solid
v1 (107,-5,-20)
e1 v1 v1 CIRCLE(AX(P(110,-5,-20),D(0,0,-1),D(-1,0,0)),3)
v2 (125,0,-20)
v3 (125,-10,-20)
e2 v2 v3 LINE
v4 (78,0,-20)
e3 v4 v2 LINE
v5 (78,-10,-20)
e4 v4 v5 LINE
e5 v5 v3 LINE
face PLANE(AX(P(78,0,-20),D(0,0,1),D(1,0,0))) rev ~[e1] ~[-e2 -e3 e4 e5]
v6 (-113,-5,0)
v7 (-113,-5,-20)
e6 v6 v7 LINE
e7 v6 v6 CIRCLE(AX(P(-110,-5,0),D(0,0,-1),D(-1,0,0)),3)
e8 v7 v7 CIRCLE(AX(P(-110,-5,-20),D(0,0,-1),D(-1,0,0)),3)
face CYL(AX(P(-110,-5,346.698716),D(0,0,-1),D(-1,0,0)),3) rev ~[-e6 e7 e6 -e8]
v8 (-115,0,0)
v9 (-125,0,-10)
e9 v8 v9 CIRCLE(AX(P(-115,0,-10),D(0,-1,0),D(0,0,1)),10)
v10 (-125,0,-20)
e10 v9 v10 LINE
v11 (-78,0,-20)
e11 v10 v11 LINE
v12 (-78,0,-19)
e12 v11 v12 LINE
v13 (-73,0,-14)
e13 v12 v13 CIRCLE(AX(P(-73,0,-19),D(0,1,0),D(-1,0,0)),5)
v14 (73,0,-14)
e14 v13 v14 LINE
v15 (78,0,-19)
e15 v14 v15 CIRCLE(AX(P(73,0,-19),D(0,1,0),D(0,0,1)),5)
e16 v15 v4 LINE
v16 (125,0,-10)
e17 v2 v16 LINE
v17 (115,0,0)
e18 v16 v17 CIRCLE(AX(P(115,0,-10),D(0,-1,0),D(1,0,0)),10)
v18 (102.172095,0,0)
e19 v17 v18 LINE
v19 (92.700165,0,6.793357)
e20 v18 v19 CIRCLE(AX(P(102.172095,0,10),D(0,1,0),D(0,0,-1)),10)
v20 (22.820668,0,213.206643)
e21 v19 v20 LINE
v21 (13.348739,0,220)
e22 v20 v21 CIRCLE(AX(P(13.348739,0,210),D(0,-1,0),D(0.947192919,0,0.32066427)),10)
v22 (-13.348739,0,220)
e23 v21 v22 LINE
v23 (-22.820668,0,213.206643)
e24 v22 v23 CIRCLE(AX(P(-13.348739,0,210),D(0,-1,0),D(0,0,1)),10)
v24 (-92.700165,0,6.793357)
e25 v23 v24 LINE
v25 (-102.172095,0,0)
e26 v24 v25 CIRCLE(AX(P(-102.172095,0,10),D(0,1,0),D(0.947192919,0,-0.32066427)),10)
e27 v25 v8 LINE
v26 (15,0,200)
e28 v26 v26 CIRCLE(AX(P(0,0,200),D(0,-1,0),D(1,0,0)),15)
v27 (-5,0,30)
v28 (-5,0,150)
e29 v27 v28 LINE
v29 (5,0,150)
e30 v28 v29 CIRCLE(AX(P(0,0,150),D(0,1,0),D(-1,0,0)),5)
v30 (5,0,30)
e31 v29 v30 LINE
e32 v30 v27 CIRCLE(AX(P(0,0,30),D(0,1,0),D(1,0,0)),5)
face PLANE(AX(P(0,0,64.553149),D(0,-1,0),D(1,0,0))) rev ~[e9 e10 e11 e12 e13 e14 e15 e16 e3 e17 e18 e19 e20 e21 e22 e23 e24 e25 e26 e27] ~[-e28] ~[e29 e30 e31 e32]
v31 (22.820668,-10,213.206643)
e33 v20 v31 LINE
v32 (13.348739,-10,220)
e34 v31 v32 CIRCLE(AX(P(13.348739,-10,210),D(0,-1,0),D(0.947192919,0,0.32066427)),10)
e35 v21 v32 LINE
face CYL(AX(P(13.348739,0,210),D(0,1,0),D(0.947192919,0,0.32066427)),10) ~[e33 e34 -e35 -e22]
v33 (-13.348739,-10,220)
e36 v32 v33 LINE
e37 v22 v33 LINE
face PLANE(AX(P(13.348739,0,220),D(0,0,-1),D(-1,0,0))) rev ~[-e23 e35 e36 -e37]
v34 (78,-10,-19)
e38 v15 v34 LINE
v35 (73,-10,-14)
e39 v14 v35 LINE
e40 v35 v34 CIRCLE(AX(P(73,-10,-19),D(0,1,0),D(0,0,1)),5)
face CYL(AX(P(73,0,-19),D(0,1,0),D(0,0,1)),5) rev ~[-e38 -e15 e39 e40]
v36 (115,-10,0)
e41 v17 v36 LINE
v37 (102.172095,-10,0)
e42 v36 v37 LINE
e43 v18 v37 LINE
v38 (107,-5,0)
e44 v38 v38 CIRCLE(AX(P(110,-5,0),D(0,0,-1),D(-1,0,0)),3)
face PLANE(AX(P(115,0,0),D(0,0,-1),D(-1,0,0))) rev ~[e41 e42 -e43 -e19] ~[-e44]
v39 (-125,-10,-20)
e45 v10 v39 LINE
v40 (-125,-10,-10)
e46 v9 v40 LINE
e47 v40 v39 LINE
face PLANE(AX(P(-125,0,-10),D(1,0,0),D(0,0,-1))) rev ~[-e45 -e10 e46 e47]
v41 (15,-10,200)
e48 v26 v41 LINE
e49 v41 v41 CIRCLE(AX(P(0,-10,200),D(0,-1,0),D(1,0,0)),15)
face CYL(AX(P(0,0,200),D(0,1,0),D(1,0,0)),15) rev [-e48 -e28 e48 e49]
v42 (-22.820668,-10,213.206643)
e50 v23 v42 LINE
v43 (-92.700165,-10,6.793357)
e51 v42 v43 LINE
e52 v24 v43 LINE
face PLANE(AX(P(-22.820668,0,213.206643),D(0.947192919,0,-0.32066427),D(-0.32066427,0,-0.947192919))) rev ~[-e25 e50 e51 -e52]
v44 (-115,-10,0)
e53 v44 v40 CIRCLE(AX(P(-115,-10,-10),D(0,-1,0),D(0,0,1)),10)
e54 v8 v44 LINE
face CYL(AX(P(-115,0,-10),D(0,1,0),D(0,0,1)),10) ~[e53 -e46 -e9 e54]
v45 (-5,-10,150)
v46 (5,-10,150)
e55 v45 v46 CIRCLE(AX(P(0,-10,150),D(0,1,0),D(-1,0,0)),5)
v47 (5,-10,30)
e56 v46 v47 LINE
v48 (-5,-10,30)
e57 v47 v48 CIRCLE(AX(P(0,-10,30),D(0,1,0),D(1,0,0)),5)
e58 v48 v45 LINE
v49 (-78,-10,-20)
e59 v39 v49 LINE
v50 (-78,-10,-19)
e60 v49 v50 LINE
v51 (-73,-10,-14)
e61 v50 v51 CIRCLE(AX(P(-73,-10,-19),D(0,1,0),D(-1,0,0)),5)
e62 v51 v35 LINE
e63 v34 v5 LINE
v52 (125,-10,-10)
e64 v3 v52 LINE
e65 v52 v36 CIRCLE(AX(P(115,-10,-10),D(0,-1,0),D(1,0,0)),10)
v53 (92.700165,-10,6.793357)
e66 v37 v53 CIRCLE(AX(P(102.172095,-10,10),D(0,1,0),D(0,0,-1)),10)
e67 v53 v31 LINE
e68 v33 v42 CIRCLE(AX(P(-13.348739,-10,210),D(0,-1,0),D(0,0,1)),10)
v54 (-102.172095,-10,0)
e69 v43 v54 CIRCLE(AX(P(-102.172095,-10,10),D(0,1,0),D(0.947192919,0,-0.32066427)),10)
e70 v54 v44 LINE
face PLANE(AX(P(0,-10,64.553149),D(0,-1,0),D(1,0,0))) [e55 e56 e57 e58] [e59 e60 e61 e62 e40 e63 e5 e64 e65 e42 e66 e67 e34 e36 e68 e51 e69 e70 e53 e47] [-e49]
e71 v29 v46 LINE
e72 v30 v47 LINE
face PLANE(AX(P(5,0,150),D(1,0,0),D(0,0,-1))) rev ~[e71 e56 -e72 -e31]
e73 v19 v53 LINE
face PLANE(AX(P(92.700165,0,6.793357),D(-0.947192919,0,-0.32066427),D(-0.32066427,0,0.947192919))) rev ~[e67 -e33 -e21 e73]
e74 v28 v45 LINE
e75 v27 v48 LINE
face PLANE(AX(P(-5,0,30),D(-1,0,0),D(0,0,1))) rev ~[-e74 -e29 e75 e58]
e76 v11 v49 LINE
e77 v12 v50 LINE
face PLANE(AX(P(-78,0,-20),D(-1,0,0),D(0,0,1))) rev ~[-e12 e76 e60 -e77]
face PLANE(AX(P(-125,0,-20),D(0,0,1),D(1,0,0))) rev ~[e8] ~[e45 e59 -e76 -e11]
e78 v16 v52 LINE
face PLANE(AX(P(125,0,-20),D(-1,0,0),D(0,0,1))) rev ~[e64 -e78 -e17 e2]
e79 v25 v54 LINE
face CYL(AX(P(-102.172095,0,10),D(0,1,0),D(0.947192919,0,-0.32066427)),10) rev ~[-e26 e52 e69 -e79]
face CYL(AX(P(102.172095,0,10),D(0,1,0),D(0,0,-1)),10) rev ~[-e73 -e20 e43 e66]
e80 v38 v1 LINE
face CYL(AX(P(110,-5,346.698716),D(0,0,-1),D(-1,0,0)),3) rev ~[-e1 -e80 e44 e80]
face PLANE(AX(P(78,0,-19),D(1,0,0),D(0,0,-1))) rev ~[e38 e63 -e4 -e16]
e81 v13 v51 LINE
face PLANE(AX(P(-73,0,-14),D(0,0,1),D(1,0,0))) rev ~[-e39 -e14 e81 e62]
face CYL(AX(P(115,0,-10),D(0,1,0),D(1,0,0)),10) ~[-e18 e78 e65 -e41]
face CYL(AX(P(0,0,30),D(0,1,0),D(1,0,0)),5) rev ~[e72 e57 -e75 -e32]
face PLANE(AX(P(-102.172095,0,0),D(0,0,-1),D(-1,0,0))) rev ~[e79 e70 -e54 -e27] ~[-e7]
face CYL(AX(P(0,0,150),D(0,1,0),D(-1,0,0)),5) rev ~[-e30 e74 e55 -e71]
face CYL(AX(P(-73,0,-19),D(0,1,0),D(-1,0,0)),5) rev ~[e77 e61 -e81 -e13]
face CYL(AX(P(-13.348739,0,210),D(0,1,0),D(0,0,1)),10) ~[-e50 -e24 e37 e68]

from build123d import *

# Parameters (mm, degrees)
F0_R     = 15
F1_DEPTH = 10
F3_D     = 6


# Not quite as in the source:
# - a feature names something its author has since deleted; it is built from what else it names


with BuildPart() as f1:
    # F0 (on Front) → F1 (new body)
    with BuildSketch(Plane.XZ):
        with BuildLine():
            Line((-125, -10), (-125, -20))
            Line((-125, -20), (-78, -20))
            Line((-78, -20), (-78, -19))
            ThreePointArc((-78, -19), (-76.5355339059, -15.4644660941), (-73, -14))
            Line((-73, -14), (73, -14))
            ThreePointArc((73, -14), (76.5355339059, -15.4644660941), (78, -19))
            Line((78, -19), (78, -20))
            Line((78, -20), (125, -20))
            Line((125, -20), (125, -10))
            ThreePointArc((125, -10), (122.0710678119, -2.9289321881), (115, 0))
            Line((115, 0), (102.1720946881, 0))
            ThreePointArc((102.1720946881, 0), (96.3439915213, 1.8739177043), (92.7001654958, 6.7933573047))
            Line((92.7001654958, 6.7933573047), (22.8206678375, 213.2066426953))
            ThreePointArc((22.8206678375, 213.2066426953), (19.176841812, 218.1260822957), (13.3487386452, 220))
            Line((13.3487386452, 220), (0, 220))
            Line((0, 220), (-13.3487386452, 220))
            ThreePointArc((-13.3487386452, 220), (-19.176841812, 218.1260822957), (-22.8206678375, 213.2066426953))
            Line((-22.8206678375, 213.2066426953), (-92.7001654958, 6.7933573047))
            ThreePointArc((-92.7001654958, 6.7933573047), (-96.3439915213, 1.8739177043), (-102.1720946881, 0))
            Line((-102.1720946881, 0), (-115, 0))
            ThreePointArc((-115, 0), (-122.0710678119, -2.9289321881), (-125, -10))
        make_face()
        with BuildLine():
            ThreePointArc((5, 30), (0, 25), (-5, 30))
            Line((-5, 30), (-5, 150))
            ThreePointArc((-5, 150), (0, 155), (5, 150))
            Line((5, 150), (5, 30))
        make_face(mode=Mode.SUBTRACT)
        with Locations((0, 200)):
            Circle(F0_R, mode=Mode.SUBTRACT)
    extrude(amount=F1_DEPTH)

    # F3 (through all)
    with Locations(Plane.XY):
        with Locations((-110, -5), (110, -5)):
            Hole(F3_D / 2)


solid = f1.part
